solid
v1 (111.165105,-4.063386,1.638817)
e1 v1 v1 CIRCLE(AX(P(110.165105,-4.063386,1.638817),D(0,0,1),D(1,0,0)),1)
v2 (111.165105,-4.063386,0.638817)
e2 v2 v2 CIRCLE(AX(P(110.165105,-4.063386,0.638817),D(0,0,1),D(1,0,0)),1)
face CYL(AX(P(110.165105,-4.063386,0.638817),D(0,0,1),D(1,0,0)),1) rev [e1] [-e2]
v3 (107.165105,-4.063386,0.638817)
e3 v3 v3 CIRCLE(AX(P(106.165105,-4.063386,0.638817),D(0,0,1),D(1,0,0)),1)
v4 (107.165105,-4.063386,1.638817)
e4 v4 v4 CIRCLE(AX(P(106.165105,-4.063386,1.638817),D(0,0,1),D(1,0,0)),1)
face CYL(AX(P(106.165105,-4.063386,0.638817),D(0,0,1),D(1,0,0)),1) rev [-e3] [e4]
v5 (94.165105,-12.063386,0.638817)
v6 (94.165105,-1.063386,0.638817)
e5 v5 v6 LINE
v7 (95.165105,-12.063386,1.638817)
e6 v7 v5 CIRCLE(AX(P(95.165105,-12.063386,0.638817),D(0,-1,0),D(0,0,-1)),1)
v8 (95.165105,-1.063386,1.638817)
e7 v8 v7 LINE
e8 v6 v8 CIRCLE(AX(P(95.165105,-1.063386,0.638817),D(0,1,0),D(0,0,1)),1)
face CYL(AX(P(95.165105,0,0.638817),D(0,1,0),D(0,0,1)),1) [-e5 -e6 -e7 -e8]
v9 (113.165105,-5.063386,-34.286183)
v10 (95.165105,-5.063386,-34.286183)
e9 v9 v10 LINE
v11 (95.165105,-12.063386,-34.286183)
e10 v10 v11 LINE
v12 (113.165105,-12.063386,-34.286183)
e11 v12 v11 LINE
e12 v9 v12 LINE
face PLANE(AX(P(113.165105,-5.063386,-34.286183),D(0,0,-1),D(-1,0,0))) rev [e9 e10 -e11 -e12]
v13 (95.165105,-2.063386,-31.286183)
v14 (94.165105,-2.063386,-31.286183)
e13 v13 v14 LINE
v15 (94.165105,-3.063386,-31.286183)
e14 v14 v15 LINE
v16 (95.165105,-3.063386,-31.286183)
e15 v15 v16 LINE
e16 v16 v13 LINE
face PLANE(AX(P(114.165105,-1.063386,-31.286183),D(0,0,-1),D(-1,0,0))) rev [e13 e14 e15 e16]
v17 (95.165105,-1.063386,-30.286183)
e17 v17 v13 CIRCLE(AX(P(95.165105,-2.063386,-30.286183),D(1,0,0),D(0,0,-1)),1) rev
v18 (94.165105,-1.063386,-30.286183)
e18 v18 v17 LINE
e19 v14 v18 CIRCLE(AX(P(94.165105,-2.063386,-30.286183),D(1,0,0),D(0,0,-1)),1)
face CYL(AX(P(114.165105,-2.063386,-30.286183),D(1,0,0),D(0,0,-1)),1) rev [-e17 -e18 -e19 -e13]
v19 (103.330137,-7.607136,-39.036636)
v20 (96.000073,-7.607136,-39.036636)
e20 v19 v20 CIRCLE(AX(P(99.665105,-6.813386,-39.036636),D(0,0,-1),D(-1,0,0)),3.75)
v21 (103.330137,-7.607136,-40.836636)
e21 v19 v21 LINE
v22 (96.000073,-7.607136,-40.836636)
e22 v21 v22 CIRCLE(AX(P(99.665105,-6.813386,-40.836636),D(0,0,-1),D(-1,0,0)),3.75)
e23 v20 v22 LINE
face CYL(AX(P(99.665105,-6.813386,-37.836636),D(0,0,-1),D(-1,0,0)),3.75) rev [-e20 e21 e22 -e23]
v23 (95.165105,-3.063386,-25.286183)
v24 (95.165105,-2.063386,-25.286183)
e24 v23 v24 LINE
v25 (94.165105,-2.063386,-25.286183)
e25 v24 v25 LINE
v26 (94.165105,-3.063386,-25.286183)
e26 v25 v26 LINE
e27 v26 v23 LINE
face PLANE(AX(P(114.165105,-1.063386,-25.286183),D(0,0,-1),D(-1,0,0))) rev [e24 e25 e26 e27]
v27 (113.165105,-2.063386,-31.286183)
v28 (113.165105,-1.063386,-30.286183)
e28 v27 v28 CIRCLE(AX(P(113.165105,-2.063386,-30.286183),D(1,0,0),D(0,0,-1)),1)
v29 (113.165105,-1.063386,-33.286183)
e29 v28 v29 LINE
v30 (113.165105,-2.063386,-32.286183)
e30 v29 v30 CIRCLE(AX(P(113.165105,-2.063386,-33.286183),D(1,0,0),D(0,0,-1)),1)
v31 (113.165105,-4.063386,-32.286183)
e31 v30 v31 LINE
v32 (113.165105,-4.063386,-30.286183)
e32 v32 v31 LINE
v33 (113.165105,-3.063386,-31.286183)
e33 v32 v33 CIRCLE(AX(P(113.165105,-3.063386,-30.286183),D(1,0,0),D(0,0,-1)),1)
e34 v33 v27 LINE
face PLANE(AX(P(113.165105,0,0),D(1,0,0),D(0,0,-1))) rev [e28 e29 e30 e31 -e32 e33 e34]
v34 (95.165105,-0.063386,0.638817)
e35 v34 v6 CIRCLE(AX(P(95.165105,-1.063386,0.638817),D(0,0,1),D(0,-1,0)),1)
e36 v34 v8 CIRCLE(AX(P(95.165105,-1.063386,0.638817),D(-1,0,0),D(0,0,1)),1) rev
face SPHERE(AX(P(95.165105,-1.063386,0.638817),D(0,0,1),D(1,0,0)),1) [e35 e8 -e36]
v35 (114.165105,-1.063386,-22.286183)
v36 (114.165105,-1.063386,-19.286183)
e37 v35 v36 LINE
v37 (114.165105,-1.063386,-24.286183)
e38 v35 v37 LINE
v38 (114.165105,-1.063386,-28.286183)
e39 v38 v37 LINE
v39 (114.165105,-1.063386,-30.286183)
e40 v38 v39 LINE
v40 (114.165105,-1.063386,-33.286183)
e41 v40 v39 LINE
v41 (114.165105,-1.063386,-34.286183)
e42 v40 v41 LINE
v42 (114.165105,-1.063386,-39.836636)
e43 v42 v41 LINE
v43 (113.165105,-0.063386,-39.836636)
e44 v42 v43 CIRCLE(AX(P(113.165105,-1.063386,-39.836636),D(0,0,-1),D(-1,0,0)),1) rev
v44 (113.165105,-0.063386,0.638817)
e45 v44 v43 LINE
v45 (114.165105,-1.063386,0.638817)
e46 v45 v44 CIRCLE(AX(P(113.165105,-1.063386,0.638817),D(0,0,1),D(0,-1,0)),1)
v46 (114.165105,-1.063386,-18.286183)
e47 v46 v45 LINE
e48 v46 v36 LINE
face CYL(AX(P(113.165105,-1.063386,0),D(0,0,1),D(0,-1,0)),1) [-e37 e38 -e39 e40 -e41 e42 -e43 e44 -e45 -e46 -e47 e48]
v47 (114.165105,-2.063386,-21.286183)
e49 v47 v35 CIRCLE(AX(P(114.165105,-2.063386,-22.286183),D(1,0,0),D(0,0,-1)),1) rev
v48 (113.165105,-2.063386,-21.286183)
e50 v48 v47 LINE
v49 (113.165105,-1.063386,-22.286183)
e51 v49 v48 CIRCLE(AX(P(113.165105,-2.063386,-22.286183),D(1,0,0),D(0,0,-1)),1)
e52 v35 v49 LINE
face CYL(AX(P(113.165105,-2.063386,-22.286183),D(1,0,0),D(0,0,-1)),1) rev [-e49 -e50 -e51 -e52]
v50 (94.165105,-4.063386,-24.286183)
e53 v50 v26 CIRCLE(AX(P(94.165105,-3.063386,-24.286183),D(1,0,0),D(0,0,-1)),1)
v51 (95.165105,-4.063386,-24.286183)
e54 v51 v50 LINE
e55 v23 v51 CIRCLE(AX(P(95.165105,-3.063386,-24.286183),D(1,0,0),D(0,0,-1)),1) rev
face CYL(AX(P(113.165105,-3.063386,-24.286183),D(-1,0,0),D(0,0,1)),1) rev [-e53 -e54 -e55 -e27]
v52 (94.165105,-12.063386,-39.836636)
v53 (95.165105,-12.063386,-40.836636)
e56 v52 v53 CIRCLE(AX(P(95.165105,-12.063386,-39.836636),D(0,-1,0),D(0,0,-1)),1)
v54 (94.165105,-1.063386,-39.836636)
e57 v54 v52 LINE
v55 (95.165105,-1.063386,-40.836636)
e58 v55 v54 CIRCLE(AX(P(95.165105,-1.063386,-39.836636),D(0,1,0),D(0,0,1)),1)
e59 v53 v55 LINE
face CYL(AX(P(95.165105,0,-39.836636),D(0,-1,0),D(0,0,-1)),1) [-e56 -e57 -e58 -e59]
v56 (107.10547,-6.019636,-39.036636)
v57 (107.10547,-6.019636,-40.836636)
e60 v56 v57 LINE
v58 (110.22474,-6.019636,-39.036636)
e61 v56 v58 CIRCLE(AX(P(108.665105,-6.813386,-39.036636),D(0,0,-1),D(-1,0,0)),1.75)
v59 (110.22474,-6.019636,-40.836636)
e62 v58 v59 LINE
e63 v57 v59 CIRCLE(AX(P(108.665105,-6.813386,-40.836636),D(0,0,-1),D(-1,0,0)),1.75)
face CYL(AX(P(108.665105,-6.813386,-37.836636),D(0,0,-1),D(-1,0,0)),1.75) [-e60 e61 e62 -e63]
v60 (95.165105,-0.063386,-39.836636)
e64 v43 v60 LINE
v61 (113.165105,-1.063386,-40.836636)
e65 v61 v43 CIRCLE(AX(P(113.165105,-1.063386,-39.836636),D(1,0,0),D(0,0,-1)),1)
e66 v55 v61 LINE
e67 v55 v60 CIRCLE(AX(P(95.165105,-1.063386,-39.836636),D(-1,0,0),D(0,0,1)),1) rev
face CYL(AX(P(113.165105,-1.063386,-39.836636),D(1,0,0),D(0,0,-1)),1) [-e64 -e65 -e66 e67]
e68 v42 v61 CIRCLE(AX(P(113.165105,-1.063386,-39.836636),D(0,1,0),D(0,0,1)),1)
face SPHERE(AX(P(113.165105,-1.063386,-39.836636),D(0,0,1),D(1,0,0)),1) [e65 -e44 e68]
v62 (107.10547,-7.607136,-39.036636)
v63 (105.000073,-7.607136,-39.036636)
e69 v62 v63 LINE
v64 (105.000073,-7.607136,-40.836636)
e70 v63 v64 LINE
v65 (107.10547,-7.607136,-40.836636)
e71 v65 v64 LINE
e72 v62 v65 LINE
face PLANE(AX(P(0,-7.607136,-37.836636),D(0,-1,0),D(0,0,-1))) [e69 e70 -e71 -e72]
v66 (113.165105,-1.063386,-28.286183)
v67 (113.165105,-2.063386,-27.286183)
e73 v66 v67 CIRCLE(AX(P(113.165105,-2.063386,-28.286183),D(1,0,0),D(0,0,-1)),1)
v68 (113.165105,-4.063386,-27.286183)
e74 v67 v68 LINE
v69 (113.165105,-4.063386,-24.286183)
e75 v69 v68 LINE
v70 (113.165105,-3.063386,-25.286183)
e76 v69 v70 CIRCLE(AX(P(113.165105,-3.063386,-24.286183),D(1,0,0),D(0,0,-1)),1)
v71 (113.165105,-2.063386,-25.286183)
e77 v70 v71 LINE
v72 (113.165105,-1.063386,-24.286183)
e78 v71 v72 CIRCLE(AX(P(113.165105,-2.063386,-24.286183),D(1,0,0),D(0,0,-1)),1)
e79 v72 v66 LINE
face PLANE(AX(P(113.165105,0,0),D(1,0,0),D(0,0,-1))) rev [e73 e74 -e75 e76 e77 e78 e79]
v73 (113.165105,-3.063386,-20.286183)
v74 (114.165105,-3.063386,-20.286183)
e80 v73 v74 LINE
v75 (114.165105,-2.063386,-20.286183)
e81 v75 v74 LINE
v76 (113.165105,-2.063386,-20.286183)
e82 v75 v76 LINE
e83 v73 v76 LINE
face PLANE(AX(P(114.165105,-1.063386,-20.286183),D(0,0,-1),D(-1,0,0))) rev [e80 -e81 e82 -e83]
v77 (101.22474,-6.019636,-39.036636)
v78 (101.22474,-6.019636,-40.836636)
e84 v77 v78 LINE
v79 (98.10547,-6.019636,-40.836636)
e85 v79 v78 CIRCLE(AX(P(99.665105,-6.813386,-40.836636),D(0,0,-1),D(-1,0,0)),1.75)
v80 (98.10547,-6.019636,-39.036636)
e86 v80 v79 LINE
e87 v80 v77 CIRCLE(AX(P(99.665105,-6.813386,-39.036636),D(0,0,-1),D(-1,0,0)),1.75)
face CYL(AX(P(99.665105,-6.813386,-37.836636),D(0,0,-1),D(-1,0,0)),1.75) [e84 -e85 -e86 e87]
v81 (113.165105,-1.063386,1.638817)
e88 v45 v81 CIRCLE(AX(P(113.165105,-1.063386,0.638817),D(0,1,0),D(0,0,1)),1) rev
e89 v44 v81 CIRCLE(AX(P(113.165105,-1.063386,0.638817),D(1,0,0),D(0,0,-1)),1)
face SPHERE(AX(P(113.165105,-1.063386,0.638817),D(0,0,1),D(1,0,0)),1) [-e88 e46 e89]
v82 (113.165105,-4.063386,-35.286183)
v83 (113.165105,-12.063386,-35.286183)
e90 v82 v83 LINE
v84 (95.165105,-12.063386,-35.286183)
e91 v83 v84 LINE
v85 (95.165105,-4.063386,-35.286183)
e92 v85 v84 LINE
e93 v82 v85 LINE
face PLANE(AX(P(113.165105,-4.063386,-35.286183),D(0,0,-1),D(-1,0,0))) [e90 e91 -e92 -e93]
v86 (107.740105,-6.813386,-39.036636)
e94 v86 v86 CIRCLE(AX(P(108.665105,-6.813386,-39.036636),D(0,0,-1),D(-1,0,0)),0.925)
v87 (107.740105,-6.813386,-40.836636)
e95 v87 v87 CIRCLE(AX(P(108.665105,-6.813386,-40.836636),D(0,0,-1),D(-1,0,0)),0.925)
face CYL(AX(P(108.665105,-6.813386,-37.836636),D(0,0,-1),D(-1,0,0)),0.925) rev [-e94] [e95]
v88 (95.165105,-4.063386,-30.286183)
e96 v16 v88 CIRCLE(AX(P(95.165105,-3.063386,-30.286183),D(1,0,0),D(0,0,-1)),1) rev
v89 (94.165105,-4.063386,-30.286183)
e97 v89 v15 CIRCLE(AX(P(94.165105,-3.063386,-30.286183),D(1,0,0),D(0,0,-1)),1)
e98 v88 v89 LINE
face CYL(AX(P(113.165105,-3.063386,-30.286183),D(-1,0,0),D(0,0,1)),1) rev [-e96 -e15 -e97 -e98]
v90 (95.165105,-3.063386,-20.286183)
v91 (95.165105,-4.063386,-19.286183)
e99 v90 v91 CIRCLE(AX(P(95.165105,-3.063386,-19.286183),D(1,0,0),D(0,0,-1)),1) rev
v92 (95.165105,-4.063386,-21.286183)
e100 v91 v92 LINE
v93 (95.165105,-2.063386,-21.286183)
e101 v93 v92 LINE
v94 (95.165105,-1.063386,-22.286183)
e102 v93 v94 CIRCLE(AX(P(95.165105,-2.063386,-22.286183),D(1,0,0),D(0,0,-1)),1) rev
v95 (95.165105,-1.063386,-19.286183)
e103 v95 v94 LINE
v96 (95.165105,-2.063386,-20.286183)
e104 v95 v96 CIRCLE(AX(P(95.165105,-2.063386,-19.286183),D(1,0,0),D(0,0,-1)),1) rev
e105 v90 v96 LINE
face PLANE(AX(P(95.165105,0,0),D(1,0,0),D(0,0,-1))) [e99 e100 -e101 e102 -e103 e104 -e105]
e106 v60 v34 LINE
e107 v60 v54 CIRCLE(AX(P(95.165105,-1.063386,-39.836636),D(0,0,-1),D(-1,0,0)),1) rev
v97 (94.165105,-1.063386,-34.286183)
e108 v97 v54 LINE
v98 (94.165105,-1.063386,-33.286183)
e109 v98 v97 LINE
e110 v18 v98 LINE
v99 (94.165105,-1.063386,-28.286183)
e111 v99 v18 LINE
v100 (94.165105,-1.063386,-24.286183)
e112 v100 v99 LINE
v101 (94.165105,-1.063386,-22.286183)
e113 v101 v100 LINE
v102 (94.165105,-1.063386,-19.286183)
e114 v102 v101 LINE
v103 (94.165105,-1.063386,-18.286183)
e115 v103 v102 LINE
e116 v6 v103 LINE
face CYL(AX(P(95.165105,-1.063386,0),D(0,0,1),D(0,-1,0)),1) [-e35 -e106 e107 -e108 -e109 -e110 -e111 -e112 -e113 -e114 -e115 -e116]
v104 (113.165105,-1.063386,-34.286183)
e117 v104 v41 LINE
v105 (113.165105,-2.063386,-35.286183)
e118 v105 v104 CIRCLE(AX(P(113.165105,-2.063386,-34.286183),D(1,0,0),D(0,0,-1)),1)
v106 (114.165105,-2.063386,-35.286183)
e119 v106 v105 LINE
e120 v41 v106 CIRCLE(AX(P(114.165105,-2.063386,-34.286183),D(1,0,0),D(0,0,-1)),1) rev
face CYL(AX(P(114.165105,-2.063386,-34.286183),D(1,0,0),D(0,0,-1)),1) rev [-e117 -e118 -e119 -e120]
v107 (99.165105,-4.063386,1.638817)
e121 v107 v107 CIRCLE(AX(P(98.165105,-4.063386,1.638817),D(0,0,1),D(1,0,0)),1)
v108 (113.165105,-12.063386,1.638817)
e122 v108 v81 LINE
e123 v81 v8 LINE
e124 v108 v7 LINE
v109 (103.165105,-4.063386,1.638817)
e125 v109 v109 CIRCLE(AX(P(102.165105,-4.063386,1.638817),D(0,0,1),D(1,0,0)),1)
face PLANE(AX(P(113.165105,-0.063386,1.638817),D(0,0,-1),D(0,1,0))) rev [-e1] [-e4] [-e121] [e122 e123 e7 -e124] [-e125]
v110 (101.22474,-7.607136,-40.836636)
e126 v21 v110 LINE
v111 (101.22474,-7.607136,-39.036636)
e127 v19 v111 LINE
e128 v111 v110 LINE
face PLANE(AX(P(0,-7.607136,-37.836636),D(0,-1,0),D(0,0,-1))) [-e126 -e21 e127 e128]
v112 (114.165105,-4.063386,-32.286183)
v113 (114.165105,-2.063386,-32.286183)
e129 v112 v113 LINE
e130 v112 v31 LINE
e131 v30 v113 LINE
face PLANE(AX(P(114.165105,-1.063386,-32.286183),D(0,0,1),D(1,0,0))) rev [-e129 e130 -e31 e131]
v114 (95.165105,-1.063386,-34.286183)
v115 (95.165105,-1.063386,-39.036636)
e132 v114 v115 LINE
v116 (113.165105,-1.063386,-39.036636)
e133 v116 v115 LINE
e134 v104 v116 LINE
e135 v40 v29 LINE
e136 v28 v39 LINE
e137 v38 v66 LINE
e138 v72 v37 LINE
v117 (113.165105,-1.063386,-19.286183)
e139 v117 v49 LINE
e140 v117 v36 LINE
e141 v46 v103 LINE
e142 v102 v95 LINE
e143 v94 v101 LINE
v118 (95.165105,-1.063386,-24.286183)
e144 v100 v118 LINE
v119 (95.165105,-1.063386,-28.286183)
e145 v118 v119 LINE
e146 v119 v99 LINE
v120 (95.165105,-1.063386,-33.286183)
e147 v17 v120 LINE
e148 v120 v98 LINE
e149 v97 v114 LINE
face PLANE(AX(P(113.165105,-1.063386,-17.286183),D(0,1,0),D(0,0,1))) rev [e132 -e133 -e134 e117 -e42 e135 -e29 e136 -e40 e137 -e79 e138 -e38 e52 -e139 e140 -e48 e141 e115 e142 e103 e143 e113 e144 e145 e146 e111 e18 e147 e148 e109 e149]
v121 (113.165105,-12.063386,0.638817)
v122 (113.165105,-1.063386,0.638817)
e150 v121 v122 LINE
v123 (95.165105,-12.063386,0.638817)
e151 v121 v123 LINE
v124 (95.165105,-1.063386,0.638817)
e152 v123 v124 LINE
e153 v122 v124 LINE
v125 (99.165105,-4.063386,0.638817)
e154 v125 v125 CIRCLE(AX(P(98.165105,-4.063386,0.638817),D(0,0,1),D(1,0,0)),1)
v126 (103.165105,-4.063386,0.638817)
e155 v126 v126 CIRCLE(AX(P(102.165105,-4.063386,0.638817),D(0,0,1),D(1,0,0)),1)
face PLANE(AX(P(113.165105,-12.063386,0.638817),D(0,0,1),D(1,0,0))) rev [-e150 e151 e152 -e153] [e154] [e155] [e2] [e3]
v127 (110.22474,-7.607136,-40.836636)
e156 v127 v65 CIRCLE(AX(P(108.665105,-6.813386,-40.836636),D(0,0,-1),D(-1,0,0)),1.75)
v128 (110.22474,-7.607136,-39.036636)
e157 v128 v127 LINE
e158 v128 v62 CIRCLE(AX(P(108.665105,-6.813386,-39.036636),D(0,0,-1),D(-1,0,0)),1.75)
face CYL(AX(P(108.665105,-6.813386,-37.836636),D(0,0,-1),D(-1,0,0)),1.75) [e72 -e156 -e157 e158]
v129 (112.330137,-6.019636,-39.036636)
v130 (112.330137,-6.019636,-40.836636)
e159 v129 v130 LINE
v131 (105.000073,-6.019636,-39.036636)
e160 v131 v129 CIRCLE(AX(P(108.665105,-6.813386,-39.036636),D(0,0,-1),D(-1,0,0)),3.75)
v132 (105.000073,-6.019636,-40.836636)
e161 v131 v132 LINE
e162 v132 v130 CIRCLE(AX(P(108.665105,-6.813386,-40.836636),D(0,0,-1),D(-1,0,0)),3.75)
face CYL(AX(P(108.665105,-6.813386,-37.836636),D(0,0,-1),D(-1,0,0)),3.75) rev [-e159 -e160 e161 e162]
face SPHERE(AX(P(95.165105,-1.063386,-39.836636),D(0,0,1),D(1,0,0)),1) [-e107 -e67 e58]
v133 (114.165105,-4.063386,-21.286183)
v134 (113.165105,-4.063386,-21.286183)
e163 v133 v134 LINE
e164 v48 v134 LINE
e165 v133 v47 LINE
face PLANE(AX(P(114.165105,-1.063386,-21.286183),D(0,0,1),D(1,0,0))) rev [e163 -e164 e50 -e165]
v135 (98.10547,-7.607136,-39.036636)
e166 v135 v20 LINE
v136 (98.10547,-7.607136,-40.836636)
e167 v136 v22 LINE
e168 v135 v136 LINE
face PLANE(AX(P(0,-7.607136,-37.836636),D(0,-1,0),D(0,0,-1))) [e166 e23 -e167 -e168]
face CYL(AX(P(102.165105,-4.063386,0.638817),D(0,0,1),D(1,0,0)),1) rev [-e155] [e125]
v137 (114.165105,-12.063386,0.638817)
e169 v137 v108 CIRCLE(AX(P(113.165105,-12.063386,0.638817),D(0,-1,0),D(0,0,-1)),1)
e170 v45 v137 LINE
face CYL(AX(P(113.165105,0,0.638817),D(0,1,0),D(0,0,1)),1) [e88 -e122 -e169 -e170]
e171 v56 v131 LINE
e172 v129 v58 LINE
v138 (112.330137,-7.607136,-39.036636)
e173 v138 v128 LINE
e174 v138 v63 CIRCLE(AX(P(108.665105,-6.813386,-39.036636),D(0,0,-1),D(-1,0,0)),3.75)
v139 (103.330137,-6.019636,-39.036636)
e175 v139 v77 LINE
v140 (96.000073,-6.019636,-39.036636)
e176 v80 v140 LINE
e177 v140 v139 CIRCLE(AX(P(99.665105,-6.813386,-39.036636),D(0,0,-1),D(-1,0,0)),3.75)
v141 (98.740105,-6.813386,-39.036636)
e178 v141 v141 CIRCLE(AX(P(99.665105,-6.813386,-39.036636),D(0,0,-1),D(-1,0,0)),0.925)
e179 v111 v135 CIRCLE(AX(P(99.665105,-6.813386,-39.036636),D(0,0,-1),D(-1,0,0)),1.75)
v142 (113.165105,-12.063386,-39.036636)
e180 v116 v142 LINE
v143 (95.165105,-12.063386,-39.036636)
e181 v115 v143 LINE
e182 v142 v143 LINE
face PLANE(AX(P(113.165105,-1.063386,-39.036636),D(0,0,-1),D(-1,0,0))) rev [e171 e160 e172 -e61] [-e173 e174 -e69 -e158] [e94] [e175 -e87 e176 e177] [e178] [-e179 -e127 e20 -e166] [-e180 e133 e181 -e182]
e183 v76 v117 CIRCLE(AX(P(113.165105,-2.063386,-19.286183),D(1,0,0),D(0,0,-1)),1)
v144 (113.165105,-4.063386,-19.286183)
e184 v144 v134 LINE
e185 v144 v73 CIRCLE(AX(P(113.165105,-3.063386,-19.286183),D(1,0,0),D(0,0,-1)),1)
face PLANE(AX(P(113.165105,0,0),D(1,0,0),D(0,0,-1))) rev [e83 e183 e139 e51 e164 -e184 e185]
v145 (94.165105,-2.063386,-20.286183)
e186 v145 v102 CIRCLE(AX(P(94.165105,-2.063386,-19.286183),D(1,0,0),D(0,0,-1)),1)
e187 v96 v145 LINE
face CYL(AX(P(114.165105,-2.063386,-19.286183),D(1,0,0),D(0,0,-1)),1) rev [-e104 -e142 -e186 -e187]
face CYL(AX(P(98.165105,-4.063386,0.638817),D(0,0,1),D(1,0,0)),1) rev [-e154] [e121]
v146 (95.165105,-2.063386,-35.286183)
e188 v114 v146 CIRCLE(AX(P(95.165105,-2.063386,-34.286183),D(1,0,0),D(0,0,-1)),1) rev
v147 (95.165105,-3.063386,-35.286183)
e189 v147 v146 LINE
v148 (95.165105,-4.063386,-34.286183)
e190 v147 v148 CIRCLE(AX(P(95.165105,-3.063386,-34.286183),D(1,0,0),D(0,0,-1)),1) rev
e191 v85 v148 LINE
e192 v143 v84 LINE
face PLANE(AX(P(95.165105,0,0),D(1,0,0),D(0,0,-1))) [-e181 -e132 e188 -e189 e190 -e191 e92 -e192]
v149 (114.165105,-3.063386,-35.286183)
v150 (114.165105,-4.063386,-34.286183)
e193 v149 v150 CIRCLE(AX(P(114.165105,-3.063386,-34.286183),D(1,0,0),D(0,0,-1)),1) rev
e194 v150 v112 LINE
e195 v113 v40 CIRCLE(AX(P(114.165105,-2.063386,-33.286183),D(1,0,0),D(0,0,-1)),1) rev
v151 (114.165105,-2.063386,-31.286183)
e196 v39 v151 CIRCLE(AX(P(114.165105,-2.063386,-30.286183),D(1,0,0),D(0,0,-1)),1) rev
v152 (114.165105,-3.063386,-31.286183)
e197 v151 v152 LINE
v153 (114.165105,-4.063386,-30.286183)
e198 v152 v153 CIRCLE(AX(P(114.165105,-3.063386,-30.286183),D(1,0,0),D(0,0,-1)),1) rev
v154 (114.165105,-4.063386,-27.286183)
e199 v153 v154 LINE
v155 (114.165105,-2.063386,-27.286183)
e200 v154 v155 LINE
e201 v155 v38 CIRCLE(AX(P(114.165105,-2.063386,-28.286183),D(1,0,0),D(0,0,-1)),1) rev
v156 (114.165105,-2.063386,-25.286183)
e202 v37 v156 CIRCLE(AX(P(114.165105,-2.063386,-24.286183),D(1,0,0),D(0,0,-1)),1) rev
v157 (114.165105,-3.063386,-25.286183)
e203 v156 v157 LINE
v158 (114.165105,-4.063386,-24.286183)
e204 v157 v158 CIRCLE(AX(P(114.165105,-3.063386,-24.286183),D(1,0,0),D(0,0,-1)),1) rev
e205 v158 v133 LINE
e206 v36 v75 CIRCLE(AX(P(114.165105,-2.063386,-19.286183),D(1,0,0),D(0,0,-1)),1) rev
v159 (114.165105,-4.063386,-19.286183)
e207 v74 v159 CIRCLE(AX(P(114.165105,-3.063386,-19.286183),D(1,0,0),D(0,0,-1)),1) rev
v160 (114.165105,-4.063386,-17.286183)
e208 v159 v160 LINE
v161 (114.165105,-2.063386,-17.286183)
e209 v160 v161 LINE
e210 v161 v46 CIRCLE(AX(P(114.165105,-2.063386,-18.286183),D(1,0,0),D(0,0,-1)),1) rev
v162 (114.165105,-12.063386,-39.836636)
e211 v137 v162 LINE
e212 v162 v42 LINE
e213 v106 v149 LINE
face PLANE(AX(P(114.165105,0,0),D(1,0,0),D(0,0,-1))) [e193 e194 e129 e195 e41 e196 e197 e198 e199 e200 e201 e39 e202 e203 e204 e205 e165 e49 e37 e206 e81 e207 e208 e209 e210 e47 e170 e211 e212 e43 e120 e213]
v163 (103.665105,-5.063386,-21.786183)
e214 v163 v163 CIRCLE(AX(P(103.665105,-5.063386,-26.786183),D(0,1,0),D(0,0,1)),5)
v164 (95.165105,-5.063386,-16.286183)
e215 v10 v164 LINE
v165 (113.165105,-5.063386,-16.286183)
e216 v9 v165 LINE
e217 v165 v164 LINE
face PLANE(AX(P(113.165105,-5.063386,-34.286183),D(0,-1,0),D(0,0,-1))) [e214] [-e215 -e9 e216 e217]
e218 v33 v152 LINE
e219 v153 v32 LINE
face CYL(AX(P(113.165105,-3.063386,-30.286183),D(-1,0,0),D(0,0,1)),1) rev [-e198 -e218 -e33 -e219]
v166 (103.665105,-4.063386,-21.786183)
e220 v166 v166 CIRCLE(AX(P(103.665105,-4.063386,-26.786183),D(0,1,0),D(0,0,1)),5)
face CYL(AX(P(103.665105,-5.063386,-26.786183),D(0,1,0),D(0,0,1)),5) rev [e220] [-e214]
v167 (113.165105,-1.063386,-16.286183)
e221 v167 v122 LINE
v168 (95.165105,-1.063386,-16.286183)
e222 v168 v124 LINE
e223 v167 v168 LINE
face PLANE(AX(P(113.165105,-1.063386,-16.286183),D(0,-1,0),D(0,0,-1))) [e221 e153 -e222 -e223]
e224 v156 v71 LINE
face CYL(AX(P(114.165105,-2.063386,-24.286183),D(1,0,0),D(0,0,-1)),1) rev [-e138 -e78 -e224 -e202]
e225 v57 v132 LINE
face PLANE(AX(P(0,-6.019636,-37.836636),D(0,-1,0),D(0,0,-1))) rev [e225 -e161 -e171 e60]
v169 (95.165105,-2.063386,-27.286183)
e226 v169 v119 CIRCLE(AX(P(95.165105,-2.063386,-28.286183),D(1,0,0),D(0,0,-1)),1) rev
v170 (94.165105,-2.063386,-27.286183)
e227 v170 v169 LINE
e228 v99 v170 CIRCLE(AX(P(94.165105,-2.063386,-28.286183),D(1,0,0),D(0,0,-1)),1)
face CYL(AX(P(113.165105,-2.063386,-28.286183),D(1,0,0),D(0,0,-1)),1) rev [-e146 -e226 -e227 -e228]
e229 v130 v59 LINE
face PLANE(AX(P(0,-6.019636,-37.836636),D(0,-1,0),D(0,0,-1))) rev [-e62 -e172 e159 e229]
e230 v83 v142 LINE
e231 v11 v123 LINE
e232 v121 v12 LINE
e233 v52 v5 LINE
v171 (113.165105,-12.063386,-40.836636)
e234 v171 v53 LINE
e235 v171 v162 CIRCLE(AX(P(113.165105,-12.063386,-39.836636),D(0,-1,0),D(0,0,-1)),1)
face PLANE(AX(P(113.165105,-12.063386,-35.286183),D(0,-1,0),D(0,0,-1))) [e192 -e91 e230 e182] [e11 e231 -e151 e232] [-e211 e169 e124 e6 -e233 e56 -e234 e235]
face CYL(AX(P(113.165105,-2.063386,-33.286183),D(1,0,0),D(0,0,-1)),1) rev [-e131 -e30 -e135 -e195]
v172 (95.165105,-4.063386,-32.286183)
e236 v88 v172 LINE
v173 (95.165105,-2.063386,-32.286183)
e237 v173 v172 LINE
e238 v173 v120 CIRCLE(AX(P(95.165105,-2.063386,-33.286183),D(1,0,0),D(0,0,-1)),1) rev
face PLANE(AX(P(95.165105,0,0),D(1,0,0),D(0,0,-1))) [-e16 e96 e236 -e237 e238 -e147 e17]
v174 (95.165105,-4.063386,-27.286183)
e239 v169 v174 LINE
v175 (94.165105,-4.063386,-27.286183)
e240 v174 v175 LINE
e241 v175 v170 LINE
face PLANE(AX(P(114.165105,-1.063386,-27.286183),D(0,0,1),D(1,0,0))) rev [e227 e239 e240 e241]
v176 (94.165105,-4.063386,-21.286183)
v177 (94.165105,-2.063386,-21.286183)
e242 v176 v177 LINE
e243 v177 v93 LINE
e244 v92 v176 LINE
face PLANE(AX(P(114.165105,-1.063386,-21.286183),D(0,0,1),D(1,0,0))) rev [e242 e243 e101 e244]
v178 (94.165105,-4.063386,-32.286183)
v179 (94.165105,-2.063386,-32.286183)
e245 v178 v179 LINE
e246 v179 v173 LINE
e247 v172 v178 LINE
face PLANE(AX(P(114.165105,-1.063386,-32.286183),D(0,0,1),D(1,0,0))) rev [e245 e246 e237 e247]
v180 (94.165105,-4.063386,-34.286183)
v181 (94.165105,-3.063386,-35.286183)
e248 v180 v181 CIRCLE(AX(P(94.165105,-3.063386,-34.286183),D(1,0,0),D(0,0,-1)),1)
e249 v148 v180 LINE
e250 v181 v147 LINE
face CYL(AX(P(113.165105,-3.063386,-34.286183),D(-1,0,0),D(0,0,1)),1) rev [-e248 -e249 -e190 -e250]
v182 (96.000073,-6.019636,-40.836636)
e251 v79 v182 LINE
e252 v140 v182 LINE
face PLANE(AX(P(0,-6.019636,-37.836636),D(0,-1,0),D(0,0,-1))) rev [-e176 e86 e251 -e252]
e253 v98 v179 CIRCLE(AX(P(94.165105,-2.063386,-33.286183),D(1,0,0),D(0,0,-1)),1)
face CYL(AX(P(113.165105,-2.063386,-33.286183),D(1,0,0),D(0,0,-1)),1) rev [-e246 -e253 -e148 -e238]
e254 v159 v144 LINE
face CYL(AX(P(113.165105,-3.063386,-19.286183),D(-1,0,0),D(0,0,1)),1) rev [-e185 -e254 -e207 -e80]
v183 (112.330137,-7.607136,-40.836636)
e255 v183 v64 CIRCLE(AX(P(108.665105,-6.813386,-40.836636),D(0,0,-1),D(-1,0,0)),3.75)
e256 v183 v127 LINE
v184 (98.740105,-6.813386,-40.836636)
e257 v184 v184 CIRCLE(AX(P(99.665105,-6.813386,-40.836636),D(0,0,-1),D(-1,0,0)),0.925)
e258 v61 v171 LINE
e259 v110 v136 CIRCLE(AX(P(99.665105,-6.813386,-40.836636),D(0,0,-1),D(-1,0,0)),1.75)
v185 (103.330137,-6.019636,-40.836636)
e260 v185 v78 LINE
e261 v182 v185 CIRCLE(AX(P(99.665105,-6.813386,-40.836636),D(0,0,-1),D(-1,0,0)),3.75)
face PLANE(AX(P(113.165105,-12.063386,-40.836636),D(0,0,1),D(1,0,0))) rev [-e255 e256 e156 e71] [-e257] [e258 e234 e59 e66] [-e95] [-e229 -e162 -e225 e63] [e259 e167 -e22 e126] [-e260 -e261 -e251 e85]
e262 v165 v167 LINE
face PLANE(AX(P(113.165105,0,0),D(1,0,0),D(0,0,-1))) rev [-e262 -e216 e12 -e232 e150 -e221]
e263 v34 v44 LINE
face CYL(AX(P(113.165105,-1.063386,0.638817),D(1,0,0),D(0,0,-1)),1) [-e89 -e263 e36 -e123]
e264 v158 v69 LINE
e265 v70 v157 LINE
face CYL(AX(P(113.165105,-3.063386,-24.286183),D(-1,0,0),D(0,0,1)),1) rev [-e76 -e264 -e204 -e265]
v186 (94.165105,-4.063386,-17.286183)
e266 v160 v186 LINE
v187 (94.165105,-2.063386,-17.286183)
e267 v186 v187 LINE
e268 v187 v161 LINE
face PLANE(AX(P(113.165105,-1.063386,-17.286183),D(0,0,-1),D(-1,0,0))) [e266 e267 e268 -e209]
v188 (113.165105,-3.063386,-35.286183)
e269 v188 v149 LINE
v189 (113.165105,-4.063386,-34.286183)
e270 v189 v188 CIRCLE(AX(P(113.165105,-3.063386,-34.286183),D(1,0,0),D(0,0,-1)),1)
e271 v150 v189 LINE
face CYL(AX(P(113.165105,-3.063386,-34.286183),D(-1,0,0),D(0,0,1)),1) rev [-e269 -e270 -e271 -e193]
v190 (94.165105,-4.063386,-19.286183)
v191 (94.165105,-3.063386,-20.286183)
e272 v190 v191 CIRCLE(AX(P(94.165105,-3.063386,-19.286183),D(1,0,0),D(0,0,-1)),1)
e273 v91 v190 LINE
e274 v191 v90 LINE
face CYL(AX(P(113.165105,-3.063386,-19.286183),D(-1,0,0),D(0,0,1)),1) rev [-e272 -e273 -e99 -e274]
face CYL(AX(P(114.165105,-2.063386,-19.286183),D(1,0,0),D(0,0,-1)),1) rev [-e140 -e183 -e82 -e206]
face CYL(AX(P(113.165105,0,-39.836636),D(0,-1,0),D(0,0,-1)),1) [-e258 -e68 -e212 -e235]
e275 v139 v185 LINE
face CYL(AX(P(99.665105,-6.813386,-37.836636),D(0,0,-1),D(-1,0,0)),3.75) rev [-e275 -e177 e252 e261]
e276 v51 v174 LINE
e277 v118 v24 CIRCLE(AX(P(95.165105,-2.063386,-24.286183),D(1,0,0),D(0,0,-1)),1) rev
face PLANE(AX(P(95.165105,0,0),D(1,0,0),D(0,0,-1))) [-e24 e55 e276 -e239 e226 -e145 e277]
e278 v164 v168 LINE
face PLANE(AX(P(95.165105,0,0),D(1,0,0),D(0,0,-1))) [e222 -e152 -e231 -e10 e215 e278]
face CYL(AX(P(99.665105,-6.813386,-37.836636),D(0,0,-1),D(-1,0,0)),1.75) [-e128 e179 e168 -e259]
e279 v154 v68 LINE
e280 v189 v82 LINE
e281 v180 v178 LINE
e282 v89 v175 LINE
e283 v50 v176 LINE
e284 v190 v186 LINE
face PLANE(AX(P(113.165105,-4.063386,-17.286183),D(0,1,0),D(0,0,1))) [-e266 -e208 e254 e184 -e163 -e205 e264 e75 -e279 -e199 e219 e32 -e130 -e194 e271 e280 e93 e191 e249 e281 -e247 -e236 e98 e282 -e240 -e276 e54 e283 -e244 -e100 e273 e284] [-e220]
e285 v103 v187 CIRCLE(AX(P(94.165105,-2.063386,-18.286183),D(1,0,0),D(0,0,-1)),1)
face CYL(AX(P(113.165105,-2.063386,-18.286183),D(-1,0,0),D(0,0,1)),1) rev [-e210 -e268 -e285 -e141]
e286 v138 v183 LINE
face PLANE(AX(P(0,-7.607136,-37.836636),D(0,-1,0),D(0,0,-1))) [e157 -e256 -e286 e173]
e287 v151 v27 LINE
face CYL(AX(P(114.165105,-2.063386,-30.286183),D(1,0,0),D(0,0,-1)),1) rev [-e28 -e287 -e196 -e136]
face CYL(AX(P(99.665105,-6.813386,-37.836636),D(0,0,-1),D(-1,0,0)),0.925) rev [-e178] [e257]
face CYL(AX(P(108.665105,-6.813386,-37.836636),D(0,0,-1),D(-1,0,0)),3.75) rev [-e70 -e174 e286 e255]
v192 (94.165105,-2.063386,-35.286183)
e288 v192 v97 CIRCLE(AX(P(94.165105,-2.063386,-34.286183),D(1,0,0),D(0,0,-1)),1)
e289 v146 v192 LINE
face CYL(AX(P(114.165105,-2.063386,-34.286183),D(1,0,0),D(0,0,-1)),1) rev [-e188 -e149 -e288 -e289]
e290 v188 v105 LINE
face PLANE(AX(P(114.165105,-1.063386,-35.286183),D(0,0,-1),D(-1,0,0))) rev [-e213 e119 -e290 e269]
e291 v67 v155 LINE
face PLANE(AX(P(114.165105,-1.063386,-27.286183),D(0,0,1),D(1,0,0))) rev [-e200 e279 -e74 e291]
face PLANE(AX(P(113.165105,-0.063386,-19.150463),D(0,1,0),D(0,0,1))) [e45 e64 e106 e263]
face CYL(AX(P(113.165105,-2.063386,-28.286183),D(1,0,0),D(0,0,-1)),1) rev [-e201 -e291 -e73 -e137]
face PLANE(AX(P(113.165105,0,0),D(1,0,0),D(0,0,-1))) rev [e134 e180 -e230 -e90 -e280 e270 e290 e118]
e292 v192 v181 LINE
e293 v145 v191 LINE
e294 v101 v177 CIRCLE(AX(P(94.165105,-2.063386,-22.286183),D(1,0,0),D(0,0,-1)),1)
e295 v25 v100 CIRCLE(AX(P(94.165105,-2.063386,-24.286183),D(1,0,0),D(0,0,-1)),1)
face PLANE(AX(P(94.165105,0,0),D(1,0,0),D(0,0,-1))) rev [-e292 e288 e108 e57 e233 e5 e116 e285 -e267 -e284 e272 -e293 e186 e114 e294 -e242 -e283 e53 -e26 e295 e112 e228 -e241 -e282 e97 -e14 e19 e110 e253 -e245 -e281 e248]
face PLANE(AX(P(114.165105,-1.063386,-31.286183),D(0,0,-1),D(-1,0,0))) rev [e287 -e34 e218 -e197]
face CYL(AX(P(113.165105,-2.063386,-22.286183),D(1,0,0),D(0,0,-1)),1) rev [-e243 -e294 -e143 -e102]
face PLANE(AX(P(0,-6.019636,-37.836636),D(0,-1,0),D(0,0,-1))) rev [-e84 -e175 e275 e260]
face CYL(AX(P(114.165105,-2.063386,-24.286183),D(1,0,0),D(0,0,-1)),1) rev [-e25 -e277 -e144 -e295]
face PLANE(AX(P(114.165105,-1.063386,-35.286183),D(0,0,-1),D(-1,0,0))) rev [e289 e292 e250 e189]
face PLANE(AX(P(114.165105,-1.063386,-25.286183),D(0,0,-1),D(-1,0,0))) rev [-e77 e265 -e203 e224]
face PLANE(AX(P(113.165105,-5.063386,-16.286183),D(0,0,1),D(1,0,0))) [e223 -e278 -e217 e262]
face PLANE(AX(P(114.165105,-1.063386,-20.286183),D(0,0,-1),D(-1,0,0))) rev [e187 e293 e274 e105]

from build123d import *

# Parameters (mm, degrees)
BOSS_EXTRUDE1_DEPTH = 18
SKETCH2_R           = 0.925
CUT_EXTRUDE1_DEPTH  = 3
SKETCH4_W           = 42.475453112
SKETCH4_H           = 12
BOSS_EXTRUDE2_DEPTH = 1
SKETCH5_W           = 42.475453112
SKETCH5_H           = 12
BOSS_EXTRUDE3_DEPTH = 1
SKETCH6_W           = 3
SKETCH6_H           = 3
SKETCH6_W_2         = 4
CUT_EXTRUDE2_DEPTH  = 48.044193641
FILLET1_R           = 1
FILLET2_R           = 1
SKETCH7_R           = 5
CUT_EXTRUDE3_DEPTH  = 1
SKETCH8_R           = 1
CUT_EXTRUDE4_DEPTH  = 1


with BuildPart() as part:
    # Sketch1 → Boss-Extrude1 (new body)
    with BuildSketch(Plane(origin=(95.165105206, 0, 0), x_dir=(0, 0, -1), z_dir=(1, 0, 0))):
        Polygon((34.286183253, -5.063386162), (16.286183253, -5.063386162), (16.286183253, -1.063386162), (-0.638816747, -1.063386162), (-0.638816747, -12.063386162), (-1.638816747, -12.063386162), (-1.638816747, -0.063386162), (0.242411468, -0.063386162), (19.150462688, -0.063386162), (40.836636365, -0.063386162), (40.836636365, -12.063386162), (39.036636365, -12.063386162), (39.036636365, -1.063386162), (17.286183253, -1.063386162), (17.286183253, -4.063386162), (35.286183253, -4.063386162), (35.286183253, -12.063386162), (34.286183253, -12.063386162), align=None)
    extrude(amount=BOSS_EXTRUDE1_DEPTH)

    # Sketch2 → Cut-Extrude1 (cut)
    with BuildSketch(Plane(origin=(0, 0, -40.836636365), x_dir=(-1, 0, 0), z_dir=(0, 0, -1))):
        with BuildLine():
            Line((-107.105470333, -6.019636162), (-105.000073019, -6.019636162))
            ThreePointArc((-105.000073019, -6.019636162), (-108.665105206, -3.063386162), (-112.330137394, -6.019636162))
            Line((-112.330137394, -6.019636162), (-110.22474008, -6.019636162))
            ThreePointArc((-110.22474008, -6.019636162), (-108.665105206, -5.063386162), (-107.105470333, -6.019636162))
        make_face()
        with BuildLine():
            ThreePointArc((-110.22474008, -7.607136162), (-108.665105206, -8.563386162), (-107.105470333, -7.607136162))
            Line((-107.105470333, -7.607136162), (-105.000073019, -7.607136162))
            ThreePointArc((-105.000073019, -7.607136162), (-108.665105206, -10.563386162), (-112.330137394, -7.607136162))
            Line((-112.330137394, -7.607136162), (-110.22474008, -7.607136162))
        make_face()
        with Locations((-108.665105206, -6.813386162)):
            Circle(SKETCH2_R)
        with Locations((-99.665105206, -6.813386162)):
            Circle(SKETCH2_R)
        with BuildLine():
            Line((-98.105470333, -6.019636162), (-96.000073019, -6.019636162))
            ThreePointArc((-96.000073019, -6.019636162), (-99.665105206, -3.063386162), (-103.330137394, -6.019636162))
            Line((-103.330137394, -6.019636162), (-101.22474008, -6.019636162))
            ThreePointArc((-101.22474008, -6.019636162), (-99.665105206, -5.063386162), (-98.105470333, -6.019636162))
        make_face()
        with BuildLine():
            Line((-101.22474008, -7.607136162), (-103.330137394, -7.607136162))
            ThreePointArc((-103.330137394, -7.607136162), (-99.665105206, -10.563386162), (-96.000073019, -7.607136162))
            Line((-96.000073019, -7.607136162), (-98.105470333, -7.607136162))
            ThreePointArc((-98.105470333, -7.607136162), (-99.665105206, -8.563386162), (-101.22474008, -7.607136162))
        make_face()
    extrude(amount=-CUT_EXTRUDE1_DEPTH, mode=Mode.SUBTRACT)

    # Sketch4 → Boss-Extrude2 (add)
    with BuildSketch(Plane(origin=(113.165105206, 0, 0), x_dir=(0, 0, -1), z_dir=(1, 0, 0))):
        with Locations((19.598909809, -6.063386162)):
            Rectangle(SKETCH4_W, SKETCH4_H)
    extrude(amount=BOSS_EXTRUDE2_DEPTH)

    # Sketch5 → Boss-Extrude3 (add)
    with BuildSketch(Plane.ZY.offset(-95.165105206)):
        with Locations((-19.598909809, -6.063386162)):
            Rectangle(SKETCH5_W, SKETCH5_H)
    extrude(amount=BOSS_EXTRUDE3_DEPTH)

    # Sketch6 → Cut-Extrude2 (cut, through all)
    with BuildSketch(Plane.ZY.offset(-94.165105206)):
        with Locations((-18.786183253, -2.563386162)):
            Rectangle(SKETCH6_W, SKETCH6_H)
        with Locations((-23.286183253, -2.563386162)):
            Rectangle(SKETCH6_W_2, SKETCH6_H)
        with Locations((-29.286183253, -2.563386162)):
            Rectangle(SKETCH6_W_2, SKETCH6_H)
        with Locations((-33.786183253, -2.563386162)):
            Rectangle(SKETCH6_W, SKETCH6_H)
    extrude(amount=-CUT_EXTRUDE2_DEPTH, mode=Mode.SUBTRACT)

    # Fillet1
    fillet1_edges = [part.edges().sort_by_distance(p)[0] for p in [
        (113.665105206, -4.063386162, -20.286183253),
        (113.665105206, -1.063386162, -20.286183253),
        (94.665105206, -4.063386162, -20.286183253),
        (94.665105206, -1.063386162, -20.286183253),
        (113.665105206, -1.063386162, -21.286183253),
        (113.665105206, -4.063386162, -25.286183253),
        (113.665105206, -1.063386162, -25.286183253),
        (94.665105206, -1.063386162, -21.286183253),
        (94.665105206, -4.063386162, -25.286183253),
        (94.665105206, -1.063386162, -25.286183253),
        (113.665105206, -1.063386162, -27.286183253),
        (113.665105206, -4.063386162, -31.286183253),
        (113.665105206, -1.063386162, -31.286183253),
        (94.665105206, -1.063386162, -27.286183253),
        (94.665105206, -4.063386162, -31.286183253),
        (94.665105206, -1.063386162, -31.286183253),
        (113.665105206, -4.063386162, -35.286183253),
        (113.665105206, -1.063386162, -35.286183253),
        (113.665105206, -1.063386162, -32.286183253),
        (94.665105206, -4.063386162, -35.286183253),
        (94.665105206, -1.063386162, -35.286183253),
        (94.665105206, -1.063386162, -32.286183253),
        (104.165105206, -1.063386162, -17.286183253),
    ]]
    fillet(fillet1_edges, radius=FILLET1_R)

    # Fillet2
    fillet2_edges = [part.edges().sort_by_distance(p)[0] for p in [
        (114.165105206, -6.063386162, -40.836636365),
        (114.165105206, -0.063386162, -19.598909809),
        (114.165105206, -6.063386162, 1.638816747),
        (94.165105206, -6.063386162, -40.836636365),
        (94.165105206, -6.063386162, 1.638816747),
        (94.165105206, -0.063386162, -19.598909809),
        (104.165105206, -0.063386162, -40.836636365),
        (104.165105206, -0.063386162, 1.638816747),
    ]]
    fillet(fillet2_edges, radius=FILLET2_R - 0.0001)  # a hair under: the kernel refuses the full size

    # Sketch7 → Cut-Extrude3 (cut)
    with BuildSketch(Plane(origin=(0, -4.063386162, 0), x_dir=(1, 0, 0), z_dir=(0, 1, 0))):
        with Locations(Location((103.665105206, 26.786183253, 0), (0, 0, 270))):
            Circle(SKETCH7_R)
    extrude(amount=-CUT_EXTRUDE3_DEPTH, mode=Mode.SUBTRACT)

    # Sketch8 → Cut-Extrude4 (cut)
    with BuildSketch(Plane.XY.offset(1.638816747)):
        with Locations((98.165105206, -4.063386162)):
            Circle(SKETCH8_R)
        with Locations((102.165105206, -4.063386162)):
            Circle(SKETCH8_R)
        with Locations((106.165105206, -4.063386162)):
            Circle(SKETCH8_R)
        with Locations((110.165105206, -4.063386162)):
            Circle(SKETCH8_R)
    extrude(amount=-CUT_EXTRUDE4_DEPTH, mode=Mode.SUBTRACT)


solid = part.part
